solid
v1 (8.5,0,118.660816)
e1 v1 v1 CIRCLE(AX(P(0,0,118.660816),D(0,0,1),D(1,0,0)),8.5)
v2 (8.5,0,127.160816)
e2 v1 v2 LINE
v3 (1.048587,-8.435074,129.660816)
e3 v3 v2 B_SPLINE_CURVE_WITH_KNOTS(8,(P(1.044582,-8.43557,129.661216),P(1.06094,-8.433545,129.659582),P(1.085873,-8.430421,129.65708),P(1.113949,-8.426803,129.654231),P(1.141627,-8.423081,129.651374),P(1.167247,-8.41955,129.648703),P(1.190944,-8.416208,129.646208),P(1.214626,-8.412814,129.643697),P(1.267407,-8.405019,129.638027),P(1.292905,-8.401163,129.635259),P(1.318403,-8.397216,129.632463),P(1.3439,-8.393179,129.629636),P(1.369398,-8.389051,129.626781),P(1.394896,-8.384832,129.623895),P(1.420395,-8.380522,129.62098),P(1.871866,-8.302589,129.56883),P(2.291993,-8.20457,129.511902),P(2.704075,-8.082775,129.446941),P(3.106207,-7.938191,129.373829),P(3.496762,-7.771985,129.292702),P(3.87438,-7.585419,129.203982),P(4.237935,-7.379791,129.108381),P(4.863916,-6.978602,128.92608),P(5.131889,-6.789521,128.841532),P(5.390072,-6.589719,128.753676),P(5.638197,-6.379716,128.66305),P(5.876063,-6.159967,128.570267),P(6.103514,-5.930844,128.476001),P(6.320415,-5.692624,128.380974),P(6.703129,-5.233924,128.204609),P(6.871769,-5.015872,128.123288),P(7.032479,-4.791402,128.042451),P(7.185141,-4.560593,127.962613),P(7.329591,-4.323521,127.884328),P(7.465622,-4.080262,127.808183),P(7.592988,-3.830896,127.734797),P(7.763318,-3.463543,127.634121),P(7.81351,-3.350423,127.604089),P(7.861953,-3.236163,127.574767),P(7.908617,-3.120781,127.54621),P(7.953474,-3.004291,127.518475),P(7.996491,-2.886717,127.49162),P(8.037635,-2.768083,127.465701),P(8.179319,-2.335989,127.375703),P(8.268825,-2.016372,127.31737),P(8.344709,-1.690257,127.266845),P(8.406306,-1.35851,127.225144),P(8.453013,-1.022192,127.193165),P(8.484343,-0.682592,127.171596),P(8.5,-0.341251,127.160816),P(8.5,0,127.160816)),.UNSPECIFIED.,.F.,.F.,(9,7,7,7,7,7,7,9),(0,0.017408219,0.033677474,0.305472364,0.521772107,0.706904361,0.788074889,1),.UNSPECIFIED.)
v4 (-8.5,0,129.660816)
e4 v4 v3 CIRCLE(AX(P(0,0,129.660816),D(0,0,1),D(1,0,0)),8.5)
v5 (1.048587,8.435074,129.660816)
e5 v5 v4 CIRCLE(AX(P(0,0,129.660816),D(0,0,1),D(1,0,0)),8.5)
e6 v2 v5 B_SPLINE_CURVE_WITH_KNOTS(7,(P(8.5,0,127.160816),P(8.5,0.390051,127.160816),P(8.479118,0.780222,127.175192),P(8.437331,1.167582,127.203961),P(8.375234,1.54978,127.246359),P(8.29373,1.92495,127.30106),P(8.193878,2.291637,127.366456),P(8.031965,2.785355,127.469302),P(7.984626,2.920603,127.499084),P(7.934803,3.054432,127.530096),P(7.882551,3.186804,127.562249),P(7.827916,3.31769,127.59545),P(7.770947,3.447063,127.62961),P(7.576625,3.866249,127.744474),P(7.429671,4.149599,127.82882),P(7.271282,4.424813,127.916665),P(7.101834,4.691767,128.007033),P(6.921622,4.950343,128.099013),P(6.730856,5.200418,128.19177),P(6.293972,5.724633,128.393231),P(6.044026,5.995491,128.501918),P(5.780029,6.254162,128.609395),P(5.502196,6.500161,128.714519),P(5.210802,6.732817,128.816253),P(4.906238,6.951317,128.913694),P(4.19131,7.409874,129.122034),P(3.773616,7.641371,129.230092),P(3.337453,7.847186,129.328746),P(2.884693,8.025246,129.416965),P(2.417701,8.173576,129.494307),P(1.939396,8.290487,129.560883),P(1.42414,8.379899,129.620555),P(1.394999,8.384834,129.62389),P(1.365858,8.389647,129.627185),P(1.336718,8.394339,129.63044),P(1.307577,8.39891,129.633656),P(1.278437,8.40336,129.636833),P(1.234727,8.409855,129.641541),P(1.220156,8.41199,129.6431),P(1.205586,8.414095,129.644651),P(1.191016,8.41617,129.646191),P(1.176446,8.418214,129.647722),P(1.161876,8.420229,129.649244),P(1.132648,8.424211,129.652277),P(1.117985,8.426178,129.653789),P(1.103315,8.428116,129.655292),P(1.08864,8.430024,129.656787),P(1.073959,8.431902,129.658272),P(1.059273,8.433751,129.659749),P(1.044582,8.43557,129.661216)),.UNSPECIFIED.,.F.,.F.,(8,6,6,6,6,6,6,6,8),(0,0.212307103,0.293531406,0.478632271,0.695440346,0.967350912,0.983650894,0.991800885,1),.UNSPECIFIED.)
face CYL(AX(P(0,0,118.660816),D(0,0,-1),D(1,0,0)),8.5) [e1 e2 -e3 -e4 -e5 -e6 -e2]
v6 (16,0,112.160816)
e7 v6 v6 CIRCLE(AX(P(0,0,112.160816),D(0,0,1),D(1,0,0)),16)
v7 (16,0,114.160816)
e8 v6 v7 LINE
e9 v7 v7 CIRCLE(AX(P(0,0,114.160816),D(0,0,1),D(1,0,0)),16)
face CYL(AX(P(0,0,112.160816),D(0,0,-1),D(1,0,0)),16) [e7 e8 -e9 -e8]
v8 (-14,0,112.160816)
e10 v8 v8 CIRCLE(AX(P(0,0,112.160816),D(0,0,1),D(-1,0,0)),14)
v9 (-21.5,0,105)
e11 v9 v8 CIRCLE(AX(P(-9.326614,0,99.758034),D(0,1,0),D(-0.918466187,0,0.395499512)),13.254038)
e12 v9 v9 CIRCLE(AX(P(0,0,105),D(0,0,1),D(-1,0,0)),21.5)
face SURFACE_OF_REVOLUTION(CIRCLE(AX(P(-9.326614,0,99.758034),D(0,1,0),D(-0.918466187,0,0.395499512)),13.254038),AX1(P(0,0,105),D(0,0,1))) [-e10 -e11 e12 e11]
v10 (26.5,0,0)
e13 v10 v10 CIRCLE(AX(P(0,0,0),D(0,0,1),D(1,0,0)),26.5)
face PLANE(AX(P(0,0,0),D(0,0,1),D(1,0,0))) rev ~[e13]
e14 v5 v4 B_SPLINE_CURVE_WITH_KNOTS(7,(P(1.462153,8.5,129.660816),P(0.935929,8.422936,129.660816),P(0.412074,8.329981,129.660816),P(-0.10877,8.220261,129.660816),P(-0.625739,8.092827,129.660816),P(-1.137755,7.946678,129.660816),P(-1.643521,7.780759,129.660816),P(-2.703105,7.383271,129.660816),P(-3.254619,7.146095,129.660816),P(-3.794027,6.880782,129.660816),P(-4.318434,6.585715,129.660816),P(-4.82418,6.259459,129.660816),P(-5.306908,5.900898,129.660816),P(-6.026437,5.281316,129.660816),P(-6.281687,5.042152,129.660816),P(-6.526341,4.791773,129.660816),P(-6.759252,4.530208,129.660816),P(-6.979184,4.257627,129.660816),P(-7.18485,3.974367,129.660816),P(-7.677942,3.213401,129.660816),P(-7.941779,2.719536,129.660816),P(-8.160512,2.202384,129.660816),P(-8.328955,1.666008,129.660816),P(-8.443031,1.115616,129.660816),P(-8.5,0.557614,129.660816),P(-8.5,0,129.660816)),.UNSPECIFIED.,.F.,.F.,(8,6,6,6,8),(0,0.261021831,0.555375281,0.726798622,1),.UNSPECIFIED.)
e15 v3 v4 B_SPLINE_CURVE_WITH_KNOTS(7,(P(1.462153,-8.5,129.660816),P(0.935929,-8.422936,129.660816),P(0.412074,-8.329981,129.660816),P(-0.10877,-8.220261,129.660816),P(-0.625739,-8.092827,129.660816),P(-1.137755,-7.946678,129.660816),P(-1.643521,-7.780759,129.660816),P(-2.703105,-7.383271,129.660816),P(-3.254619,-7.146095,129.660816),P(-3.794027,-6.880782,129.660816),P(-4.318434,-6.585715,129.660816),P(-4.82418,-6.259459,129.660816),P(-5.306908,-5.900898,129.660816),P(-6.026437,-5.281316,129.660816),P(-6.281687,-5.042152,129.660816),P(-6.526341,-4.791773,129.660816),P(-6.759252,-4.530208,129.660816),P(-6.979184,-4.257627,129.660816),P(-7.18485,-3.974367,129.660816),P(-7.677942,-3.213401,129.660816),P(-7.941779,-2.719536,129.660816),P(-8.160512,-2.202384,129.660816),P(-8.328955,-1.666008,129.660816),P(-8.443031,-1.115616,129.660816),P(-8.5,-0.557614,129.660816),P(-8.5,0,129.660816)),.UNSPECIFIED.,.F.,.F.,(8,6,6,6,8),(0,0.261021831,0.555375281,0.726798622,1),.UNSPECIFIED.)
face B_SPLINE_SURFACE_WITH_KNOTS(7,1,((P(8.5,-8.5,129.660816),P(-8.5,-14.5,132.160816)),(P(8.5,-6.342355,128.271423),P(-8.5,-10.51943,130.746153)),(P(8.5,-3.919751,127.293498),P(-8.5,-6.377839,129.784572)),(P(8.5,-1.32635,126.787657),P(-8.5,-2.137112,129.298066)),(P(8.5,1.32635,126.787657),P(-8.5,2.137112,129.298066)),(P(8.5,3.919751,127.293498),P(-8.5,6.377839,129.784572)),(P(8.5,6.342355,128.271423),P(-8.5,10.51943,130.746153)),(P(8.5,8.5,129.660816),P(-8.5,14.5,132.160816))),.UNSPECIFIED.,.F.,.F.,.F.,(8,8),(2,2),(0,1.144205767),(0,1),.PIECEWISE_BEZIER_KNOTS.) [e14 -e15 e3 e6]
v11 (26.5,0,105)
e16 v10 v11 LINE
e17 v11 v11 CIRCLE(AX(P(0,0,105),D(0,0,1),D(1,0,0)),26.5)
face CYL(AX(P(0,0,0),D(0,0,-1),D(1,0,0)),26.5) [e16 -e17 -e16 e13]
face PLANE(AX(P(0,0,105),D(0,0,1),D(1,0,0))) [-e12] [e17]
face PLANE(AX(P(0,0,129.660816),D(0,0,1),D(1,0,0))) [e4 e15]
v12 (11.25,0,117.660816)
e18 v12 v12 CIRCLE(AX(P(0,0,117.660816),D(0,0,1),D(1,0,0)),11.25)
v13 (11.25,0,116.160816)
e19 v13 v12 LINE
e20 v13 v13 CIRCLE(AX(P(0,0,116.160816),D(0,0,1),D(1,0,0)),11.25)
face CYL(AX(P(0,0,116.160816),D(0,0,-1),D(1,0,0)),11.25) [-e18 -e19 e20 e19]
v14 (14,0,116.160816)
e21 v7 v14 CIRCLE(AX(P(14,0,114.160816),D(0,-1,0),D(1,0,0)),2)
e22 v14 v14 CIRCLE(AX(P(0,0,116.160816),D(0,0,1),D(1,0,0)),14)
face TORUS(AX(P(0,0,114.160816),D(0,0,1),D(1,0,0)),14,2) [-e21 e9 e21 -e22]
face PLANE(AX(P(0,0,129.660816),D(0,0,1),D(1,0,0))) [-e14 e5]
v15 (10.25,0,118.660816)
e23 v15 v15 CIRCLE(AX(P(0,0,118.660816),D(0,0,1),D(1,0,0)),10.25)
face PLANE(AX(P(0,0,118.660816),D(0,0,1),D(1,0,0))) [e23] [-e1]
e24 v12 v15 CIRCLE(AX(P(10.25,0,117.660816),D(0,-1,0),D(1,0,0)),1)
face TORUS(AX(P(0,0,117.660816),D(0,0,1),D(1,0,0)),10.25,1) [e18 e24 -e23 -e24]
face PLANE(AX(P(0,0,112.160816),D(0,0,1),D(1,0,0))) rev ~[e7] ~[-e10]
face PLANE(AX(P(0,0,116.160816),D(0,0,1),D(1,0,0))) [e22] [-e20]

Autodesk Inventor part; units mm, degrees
ref_plane "XZ Plane" through (0, 0, 0) normal (0, 1, 0) x (-1, 0, 0)
sketch "Sketch1" plane through (0, 0, 0) normal (0, 0, 1) x (1, 0, 0)
  circle A0 centre (0, 0) radius 26.5
  dimension "d0" = 53
extrude "Extrusion1" add sketch "Sketch1" along normal blind 105
sketch "Sketch2" plane through (0, 0, 0) normal (0, 1, 0) x (-1, 0, 0)
  line L0 (6.5, 97) -> (21.5, 97)
  line L1 (21.5, 97) -> (21.5, 105)
  line L2 (14, 112.160816) -> (6.5, 112.160816)
  line L3 (6.5, 105) -> (6.5, 97)
  line L4 (26.5, 0) -> (26.5, 105) construction
  line L5 (0, -19.756358) -> (0, 218.345658) construction
  line L6 (21.5, 105) -> (0, 105)
  line L7 (0, 105) -> (0, 112.160816)
  line L8 (0, 112.160816) -> (14, 112.160816)
  line L9 (14, 122.762224) -> (14, 96.929674) construction
  arc A0 (21.5, 105) -> (14, 112.160816) centre (9.326615, 99.758035) ccw construction
  arc A1 (21.5, 105) -> (14, 112.160816) centre (9.326615, 99.758035) ccw
  line L10 (0, -67.376762) -> (0, 265.966062)
  point P0 (0, 0)
  dimension "d4" = 8
  dimension "d5" = 5
revolve "Revolution1" add sketch "Sketch2" angle 360 about axis through (0, 0, -10) along (0, 0, 1) contours L6 L7 L8 L2 A1
sketch "Sketch3" plane through (0, 0, 112.160816) normal (0, 0, 1) x (1, 0, 0)
  circle A0 centre (0, 0) radius 14 projected
  circle A1 centre (0, 0) radius 16
  dimension "d8" = 32
extrude "Extrusion2" add sketch "Sketch3" along normal blind 4 contours A0 | A1
sketch "Sketch4" plane through (0, 0, 116.160816) normal (0, 0, 1) x (1, 0, 0)
  circle A0 centre (0, 0) radius 16 projected
  circle A1 centre (0, 0) radius 11.25
  dimension "d11" = 22.5
extrude "Extrusion3" add sketch "Sketch4" along normal blind 2.5 contours A1
sketch "Sketch5" plane through (0, 0, 118.660816) normal (0, 0, 1) x (1, 0, 0)
  circle A0 centre (0, 0) radius 11.25 projected
  circle A1 centre (0, 0) radius 8.5
  dimension "d14" = 17
extrude "Extrusion4" add sketch "Sketch5" along normal blind 11 contours A1
ref_plane "Work Plane1" through (8.5, 0, 0) normal (1, 0, 0) x (0, 1, 0)
sketch "Sketch6" plane through (8.5, 0, 0) normal (1, 0, 0) x (0, 1, 0)
  line L0 (8.5, 129.660816) -> (-8.5, 129.660816) construction
  line L1 (11.25, 118.660816) -> (-11.25, 118.660816) construction
  line L2 (-11.850613, 127.160816) -> (16.091514, 127.160816) construction
  line L3 (-8.5, 118.660816) -> (-8.5, 129.660816) construction
  line L4 (8.5, 118.660816) -> (8.5, 129.660816) construction
  arc A0 (-8.5, 129.660816) -> (8.5, 129.660816) centre (0, 142.860816) ccw
  line L5 (-8.5, 129.660816) -> (8.5, 129.660816)
  point P0 (0, 0)
  dimension "d18" = 8.5
ref_plane "Work Plane2" through (-8.5, 0, 0) normal (1, 0, 0) x (0, 1, 0)
sketch "Sketch7" plane through (-8.5, 0, 0) normal (1, 0, 0) x (0, 1, 0)
  line L0 (8.5, 118.660816) -> (8.5, 129.660816) construction
  line L1 (-8.5, 118.660816) -> (-8.5, 129.660816) construction
  line L2 (11.25, 118.660816) -> (-11.25, 118.660816) construction
  line L3 (10.28234, 132.160816) -> (-15.326143, 132.160816) construction
  line L4 (8.5, 128.85356) -> (8.5, 132.770152) construction
  line L5 (-8.5, 128.418383) -> (-8.5, 133.238804) construction
  line L6 (8.5, 132.160816) -> (-8.5, 132.160816)
  line L7 (14.5, 124.804712) -> (14.5, 141.766568) construction
  line L8 (-14.5, 142.728943) -> (-14.5, 126.729462) construction
  line L9 (18.190676, 132.160816) -> (-22.229061, 132.160816) construction
  arc A0 (-14.5, 132.160816) -> (14.5, 132.160816) centre (0, 172.960816) ccw
  line L10 (14.5, 132.160816) -> (-14.5, 132.160816)
  point P0 (0, 0)
  dimension "d22" = 6
  dimension "d23" = 6
sketch "Sketch6 outline for Loft1" plane through (8.5, 0, 0) normal (1, 0, 0) x (0, 1, 0)
  line L0 (8.5, 129.660816) -> (-8.5, 129.660816)
  arc A0 (-8.5, 129.660816) -> (8.5, 129.660816) centre (0, 142.860816) ccw
sketch "Sketch7 outline for Loft1" plane through (-8.5, 0, 0) normal (1, 0, 0) x (0, 1, 0)
  line L0 (14.5, 132.160816) -> (-14.5, 132.160816)
  arc A0 (-14.5, 132.160816) -> (14.5, 132.160816) centre (0, 172.960816) ccw
loft "Loft1" cut profiles "Sketch6 outline for Loft1", "Sketch7 outline for Loft1"
fillet "Fillet1" radius 2 1 edges at (-16, 0, 116.1608)
fillet "Fillet2" radius 1 1 edges at (-11.25, 0, 118.6608)
properties part number "SprayCan"
